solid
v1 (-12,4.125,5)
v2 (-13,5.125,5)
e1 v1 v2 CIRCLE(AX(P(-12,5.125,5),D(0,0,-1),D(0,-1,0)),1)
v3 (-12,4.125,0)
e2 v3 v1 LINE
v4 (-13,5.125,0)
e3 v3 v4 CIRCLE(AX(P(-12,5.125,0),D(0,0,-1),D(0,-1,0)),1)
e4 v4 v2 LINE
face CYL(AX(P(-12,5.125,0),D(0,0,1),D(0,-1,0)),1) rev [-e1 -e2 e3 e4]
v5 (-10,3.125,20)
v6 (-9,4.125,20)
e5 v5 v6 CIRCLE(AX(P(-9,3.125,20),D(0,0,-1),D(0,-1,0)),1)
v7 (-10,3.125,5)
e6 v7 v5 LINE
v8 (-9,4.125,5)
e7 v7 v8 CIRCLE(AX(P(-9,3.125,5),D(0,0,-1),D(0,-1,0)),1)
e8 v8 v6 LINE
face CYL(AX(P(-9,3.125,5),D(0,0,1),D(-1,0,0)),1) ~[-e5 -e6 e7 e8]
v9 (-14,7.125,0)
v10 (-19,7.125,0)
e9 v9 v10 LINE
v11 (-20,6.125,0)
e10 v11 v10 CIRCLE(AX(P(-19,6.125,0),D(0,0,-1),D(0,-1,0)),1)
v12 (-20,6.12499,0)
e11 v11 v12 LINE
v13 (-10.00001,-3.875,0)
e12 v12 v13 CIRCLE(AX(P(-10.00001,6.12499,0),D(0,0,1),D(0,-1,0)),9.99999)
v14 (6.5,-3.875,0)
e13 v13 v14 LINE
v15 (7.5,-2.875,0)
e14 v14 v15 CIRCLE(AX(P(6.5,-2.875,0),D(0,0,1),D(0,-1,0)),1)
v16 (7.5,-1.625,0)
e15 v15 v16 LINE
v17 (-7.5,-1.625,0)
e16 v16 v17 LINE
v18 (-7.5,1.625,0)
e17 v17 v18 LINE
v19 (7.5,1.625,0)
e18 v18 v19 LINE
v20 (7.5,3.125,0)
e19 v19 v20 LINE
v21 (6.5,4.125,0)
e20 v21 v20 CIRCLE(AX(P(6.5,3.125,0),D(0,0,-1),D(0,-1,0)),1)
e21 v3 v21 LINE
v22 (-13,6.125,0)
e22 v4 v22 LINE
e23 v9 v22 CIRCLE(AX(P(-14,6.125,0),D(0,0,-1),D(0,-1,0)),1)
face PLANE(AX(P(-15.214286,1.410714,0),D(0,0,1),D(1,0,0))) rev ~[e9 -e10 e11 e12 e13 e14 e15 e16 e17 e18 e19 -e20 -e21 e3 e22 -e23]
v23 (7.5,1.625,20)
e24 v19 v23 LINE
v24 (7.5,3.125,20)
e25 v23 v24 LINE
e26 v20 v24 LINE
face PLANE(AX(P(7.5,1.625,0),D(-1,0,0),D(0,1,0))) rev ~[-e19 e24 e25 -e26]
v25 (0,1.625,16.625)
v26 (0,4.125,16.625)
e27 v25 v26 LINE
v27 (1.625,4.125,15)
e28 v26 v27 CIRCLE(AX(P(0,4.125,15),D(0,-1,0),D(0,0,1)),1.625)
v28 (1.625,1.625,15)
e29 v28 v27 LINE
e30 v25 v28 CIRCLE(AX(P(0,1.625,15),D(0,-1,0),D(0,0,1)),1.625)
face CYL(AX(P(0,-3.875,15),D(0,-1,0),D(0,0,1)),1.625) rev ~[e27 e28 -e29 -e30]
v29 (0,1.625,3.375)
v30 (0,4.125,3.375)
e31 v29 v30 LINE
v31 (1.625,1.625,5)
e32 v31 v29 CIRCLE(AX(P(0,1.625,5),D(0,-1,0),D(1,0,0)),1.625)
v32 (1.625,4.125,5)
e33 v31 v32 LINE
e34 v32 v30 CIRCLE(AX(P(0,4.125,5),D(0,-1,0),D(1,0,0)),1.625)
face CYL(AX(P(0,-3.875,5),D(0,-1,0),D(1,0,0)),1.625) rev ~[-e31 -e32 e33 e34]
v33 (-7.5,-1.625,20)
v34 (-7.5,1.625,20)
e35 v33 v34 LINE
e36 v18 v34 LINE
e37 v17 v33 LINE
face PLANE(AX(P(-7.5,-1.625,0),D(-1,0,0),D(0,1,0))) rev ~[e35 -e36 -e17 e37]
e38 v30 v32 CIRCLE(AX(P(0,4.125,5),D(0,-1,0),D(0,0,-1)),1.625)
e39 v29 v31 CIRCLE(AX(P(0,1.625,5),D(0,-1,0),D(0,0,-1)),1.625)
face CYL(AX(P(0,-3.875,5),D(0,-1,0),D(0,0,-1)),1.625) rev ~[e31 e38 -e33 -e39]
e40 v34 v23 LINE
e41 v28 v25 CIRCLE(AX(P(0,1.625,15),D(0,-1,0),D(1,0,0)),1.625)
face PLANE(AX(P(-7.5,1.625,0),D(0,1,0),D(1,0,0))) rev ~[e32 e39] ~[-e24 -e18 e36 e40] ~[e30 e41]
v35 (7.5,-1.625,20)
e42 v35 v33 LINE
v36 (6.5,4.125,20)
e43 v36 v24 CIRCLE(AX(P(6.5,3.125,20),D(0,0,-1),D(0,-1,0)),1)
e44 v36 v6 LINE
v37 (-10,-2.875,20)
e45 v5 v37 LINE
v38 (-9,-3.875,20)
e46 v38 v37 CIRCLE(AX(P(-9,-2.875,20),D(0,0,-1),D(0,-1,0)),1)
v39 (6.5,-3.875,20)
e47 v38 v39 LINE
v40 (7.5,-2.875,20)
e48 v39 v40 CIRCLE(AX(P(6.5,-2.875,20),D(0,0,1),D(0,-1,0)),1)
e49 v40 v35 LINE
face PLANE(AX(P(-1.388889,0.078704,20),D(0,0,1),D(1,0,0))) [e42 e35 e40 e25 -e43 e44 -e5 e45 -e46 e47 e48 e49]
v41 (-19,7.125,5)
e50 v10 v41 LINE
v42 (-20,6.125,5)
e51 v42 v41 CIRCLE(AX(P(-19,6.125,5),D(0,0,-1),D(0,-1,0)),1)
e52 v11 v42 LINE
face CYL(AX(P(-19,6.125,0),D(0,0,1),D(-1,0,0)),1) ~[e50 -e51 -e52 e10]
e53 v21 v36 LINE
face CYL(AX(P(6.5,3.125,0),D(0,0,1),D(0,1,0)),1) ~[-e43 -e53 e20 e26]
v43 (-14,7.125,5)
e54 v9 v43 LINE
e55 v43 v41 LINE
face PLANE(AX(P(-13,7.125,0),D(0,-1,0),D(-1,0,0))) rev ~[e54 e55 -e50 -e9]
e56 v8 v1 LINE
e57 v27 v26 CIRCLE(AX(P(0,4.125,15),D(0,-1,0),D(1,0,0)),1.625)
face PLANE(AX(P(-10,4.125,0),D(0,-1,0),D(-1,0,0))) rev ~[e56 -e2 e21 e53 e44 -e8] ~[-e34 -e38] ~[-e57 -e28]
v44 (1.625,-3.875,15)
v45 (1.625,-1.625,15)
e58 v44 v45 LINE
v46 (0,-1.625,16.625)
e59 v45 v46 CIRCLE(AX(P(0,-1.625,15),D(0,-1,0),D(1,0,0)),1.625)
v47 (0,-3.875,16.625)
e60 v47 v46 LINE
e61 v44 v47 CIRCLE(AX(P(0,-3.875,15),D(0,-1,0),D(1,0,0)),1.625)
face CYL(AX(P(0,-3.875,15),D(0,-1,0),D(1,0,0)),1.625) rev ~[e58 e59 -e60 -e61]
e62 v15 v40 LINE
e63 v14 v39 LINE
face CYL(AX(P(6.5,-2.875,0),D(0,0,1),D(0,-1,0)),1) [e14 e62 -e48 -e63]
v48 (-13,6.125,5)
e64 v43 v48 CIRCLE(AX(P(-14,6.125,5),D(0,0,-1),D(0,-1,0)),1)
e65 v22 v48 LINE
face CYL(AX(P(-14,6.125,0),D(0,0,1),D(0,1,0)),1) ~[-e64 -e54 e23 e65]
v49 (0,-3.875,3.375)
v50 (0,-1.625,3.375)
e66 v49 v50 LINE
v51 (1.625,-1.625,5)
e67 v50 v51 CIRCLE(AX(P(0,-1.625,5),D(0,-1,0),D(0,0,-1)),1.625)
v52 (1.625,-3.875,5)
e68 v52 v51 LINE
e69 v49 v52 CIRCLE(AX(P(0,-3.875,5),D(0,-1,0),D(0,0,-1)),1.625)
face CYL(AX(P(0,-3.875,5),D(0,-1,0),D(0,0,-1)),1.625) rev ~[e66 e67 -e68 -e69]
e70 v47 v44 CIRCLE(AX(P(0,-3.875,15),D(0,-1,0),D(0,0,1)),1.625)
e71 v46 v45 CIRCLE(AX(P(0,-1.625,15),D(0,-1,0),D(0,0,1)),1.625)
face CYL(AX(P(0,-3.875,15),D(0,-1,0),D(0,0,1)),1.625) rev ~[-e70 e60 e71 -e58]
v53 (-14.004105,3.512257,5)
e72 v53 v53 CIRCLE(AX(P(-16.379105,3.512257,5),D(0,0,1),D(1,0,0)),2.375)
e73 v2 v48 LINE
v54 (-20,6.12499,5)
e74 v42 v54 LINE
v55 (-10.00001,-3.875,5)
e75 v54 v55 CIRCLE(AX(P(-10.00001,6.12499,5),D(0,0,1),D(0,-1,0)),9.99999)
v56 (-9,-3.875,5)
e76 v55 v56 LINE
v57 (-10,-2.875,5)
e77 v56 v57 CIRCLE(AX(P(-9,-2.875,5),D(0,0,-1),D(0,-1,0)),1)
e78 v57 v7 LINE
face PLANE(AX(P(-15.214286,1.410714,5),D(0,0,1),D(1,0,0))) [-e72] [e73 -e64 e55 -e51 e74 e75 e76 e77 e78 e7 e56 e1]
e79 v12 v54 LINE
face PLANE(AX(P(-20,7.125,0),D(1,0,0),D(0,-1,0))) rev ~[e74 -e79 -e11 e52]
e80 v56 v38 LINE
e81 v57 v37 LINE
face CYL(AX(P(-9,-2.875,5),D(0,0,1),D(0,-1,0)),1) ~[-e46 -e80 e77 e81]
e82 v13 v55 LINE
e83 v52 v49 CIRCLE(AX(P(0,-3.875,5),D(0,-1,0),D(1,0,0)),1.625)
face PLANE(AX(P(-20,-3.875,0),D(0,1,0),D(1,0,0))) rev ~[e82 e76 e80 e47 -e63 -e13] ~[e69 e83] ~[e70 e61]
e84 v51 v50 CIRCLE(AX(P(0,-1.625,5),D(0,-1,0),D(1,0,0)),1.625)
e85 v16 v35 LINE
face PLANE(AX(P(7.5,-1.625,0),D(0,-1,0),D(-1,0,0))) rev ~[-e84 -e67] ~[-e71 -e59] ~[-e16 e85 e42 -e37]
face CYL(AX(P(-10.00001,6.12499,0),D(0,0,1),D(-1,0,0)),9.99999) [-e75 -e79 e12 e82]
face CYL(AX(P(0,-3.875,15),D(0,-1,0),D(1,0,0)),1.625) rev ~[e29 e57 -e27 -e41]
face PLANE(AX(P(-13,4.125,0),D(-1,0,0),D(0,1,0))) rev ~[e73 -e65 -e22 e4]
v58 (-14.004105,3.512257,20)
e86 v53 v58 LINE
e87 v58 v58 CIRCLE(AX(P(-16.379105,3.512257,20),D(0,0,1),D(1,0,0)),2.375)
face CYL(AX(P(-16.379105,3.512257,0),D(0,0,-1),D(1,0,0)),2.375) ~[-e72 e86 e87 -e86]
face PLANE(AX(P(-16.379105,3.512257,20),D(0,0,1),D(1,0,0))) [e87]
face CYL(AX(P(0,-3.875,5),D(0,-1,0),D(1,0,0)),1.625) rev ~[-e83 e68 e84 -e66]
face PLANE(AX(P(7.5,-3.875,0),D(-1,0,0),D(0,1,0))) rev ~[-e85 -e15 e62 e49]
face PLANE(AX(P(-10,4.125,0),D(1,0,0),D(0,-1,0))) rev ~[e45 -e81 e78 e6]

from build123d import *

# Parameters (mm, degrees)
F1_DEPTH = 20
F0_R     = 2.375
F2_DEPTH = 5
F3_DEPTH = 20
F4_R     = 1
F6_DEPTH = 8.5
F7_R     = 9.99999


# Not quite as in the source:
# - a fillet or chamfer is up to 0.001 mm smaller than in the source, because OpenCascade refuses the exact size


with BuildPart() as f1:
    # F0 (on Top) → F1 (new body)
    with BuildSketch(Plane.XY):
        Polygon((7.5, -3.875), (7.5, -1.625), (-7.5, -1.625), (-7.5, 1.625), (7.5, 1.625), (7.5, 4.125), (-10, 4.125), (-10, -3.875), align=None)
    extrude(amount=F1_DEPTH)

    # F0 (on Top) → F2 (join)
    with BuildSketch(Plane.XY):
        Polygon((-20, -3.875), (-10, -3.875), (-10, 4.125), (-13, 4.125), (-13, 7.125), (-20, 7.125), align=None)
        with Locations((-16.3791049272, 3.5122572444)):
            Circle(F0_R, mode=Mode.SUBTRACT)
    extrude(amount=F2_DEPTH)

    # F0 (on Top) → F3 (join)
    with BuildSketch(Plane.XY):
        with Locations((-16.3791049272, 3.5122572444)):
            Circle(F0_R)
    extrude(amount=F3_DEPTH)

    # F4
    f4_edges = [f1.edges().sort_by_distance(p)[0] for p in [
        (-20, 7.125, 2.5),
        (7.5, 4.125, 10),
        (7.5, -3.875, 10),
        (-10, 4.125, 12.5),
        (-10, -3.875, 12.5),
        (-13, 7.125, 2.5),
        (-13, 4.125, 2.5),
    ]]
    fillet(f4_edges, radius=F4_R)

    # F5 (on face) → F6 (cut)
    with BuildSketch(Plane.XZ.offset(3.875)):
        with BuildLine():
            ThreePointArc((1.625, 15), (1.1490485194, 16.1490485194), (0, 16.625))
            ThreePointArc((0, 16.625), (-1.1490485194, 13.8509514806), (1.625, 15))
        make_face()
        with BuildLine():
            ThreePointArc((1.625, 5), (-1.1490485194, 6.1490485194), (0, 3.375))
            ThreePointArc((0, 3.375), (1.1490485194, 3.8509514806), (1.625, 5))
        make_face()
    extrude(amount=-F6_DEPTH, mode=Mode.SUBTRACT)

    # F7 (radius 10 in the source; OpenCascade refuses exactly that, so slightly less here)
    f7_edges = [f1.edges().sort_by_distance(p)[0] for p in [
        (-20, -3.875, 2.5),
    ]]
    fillet(f7_edges, radius=F7_R)


solid = f1.part
